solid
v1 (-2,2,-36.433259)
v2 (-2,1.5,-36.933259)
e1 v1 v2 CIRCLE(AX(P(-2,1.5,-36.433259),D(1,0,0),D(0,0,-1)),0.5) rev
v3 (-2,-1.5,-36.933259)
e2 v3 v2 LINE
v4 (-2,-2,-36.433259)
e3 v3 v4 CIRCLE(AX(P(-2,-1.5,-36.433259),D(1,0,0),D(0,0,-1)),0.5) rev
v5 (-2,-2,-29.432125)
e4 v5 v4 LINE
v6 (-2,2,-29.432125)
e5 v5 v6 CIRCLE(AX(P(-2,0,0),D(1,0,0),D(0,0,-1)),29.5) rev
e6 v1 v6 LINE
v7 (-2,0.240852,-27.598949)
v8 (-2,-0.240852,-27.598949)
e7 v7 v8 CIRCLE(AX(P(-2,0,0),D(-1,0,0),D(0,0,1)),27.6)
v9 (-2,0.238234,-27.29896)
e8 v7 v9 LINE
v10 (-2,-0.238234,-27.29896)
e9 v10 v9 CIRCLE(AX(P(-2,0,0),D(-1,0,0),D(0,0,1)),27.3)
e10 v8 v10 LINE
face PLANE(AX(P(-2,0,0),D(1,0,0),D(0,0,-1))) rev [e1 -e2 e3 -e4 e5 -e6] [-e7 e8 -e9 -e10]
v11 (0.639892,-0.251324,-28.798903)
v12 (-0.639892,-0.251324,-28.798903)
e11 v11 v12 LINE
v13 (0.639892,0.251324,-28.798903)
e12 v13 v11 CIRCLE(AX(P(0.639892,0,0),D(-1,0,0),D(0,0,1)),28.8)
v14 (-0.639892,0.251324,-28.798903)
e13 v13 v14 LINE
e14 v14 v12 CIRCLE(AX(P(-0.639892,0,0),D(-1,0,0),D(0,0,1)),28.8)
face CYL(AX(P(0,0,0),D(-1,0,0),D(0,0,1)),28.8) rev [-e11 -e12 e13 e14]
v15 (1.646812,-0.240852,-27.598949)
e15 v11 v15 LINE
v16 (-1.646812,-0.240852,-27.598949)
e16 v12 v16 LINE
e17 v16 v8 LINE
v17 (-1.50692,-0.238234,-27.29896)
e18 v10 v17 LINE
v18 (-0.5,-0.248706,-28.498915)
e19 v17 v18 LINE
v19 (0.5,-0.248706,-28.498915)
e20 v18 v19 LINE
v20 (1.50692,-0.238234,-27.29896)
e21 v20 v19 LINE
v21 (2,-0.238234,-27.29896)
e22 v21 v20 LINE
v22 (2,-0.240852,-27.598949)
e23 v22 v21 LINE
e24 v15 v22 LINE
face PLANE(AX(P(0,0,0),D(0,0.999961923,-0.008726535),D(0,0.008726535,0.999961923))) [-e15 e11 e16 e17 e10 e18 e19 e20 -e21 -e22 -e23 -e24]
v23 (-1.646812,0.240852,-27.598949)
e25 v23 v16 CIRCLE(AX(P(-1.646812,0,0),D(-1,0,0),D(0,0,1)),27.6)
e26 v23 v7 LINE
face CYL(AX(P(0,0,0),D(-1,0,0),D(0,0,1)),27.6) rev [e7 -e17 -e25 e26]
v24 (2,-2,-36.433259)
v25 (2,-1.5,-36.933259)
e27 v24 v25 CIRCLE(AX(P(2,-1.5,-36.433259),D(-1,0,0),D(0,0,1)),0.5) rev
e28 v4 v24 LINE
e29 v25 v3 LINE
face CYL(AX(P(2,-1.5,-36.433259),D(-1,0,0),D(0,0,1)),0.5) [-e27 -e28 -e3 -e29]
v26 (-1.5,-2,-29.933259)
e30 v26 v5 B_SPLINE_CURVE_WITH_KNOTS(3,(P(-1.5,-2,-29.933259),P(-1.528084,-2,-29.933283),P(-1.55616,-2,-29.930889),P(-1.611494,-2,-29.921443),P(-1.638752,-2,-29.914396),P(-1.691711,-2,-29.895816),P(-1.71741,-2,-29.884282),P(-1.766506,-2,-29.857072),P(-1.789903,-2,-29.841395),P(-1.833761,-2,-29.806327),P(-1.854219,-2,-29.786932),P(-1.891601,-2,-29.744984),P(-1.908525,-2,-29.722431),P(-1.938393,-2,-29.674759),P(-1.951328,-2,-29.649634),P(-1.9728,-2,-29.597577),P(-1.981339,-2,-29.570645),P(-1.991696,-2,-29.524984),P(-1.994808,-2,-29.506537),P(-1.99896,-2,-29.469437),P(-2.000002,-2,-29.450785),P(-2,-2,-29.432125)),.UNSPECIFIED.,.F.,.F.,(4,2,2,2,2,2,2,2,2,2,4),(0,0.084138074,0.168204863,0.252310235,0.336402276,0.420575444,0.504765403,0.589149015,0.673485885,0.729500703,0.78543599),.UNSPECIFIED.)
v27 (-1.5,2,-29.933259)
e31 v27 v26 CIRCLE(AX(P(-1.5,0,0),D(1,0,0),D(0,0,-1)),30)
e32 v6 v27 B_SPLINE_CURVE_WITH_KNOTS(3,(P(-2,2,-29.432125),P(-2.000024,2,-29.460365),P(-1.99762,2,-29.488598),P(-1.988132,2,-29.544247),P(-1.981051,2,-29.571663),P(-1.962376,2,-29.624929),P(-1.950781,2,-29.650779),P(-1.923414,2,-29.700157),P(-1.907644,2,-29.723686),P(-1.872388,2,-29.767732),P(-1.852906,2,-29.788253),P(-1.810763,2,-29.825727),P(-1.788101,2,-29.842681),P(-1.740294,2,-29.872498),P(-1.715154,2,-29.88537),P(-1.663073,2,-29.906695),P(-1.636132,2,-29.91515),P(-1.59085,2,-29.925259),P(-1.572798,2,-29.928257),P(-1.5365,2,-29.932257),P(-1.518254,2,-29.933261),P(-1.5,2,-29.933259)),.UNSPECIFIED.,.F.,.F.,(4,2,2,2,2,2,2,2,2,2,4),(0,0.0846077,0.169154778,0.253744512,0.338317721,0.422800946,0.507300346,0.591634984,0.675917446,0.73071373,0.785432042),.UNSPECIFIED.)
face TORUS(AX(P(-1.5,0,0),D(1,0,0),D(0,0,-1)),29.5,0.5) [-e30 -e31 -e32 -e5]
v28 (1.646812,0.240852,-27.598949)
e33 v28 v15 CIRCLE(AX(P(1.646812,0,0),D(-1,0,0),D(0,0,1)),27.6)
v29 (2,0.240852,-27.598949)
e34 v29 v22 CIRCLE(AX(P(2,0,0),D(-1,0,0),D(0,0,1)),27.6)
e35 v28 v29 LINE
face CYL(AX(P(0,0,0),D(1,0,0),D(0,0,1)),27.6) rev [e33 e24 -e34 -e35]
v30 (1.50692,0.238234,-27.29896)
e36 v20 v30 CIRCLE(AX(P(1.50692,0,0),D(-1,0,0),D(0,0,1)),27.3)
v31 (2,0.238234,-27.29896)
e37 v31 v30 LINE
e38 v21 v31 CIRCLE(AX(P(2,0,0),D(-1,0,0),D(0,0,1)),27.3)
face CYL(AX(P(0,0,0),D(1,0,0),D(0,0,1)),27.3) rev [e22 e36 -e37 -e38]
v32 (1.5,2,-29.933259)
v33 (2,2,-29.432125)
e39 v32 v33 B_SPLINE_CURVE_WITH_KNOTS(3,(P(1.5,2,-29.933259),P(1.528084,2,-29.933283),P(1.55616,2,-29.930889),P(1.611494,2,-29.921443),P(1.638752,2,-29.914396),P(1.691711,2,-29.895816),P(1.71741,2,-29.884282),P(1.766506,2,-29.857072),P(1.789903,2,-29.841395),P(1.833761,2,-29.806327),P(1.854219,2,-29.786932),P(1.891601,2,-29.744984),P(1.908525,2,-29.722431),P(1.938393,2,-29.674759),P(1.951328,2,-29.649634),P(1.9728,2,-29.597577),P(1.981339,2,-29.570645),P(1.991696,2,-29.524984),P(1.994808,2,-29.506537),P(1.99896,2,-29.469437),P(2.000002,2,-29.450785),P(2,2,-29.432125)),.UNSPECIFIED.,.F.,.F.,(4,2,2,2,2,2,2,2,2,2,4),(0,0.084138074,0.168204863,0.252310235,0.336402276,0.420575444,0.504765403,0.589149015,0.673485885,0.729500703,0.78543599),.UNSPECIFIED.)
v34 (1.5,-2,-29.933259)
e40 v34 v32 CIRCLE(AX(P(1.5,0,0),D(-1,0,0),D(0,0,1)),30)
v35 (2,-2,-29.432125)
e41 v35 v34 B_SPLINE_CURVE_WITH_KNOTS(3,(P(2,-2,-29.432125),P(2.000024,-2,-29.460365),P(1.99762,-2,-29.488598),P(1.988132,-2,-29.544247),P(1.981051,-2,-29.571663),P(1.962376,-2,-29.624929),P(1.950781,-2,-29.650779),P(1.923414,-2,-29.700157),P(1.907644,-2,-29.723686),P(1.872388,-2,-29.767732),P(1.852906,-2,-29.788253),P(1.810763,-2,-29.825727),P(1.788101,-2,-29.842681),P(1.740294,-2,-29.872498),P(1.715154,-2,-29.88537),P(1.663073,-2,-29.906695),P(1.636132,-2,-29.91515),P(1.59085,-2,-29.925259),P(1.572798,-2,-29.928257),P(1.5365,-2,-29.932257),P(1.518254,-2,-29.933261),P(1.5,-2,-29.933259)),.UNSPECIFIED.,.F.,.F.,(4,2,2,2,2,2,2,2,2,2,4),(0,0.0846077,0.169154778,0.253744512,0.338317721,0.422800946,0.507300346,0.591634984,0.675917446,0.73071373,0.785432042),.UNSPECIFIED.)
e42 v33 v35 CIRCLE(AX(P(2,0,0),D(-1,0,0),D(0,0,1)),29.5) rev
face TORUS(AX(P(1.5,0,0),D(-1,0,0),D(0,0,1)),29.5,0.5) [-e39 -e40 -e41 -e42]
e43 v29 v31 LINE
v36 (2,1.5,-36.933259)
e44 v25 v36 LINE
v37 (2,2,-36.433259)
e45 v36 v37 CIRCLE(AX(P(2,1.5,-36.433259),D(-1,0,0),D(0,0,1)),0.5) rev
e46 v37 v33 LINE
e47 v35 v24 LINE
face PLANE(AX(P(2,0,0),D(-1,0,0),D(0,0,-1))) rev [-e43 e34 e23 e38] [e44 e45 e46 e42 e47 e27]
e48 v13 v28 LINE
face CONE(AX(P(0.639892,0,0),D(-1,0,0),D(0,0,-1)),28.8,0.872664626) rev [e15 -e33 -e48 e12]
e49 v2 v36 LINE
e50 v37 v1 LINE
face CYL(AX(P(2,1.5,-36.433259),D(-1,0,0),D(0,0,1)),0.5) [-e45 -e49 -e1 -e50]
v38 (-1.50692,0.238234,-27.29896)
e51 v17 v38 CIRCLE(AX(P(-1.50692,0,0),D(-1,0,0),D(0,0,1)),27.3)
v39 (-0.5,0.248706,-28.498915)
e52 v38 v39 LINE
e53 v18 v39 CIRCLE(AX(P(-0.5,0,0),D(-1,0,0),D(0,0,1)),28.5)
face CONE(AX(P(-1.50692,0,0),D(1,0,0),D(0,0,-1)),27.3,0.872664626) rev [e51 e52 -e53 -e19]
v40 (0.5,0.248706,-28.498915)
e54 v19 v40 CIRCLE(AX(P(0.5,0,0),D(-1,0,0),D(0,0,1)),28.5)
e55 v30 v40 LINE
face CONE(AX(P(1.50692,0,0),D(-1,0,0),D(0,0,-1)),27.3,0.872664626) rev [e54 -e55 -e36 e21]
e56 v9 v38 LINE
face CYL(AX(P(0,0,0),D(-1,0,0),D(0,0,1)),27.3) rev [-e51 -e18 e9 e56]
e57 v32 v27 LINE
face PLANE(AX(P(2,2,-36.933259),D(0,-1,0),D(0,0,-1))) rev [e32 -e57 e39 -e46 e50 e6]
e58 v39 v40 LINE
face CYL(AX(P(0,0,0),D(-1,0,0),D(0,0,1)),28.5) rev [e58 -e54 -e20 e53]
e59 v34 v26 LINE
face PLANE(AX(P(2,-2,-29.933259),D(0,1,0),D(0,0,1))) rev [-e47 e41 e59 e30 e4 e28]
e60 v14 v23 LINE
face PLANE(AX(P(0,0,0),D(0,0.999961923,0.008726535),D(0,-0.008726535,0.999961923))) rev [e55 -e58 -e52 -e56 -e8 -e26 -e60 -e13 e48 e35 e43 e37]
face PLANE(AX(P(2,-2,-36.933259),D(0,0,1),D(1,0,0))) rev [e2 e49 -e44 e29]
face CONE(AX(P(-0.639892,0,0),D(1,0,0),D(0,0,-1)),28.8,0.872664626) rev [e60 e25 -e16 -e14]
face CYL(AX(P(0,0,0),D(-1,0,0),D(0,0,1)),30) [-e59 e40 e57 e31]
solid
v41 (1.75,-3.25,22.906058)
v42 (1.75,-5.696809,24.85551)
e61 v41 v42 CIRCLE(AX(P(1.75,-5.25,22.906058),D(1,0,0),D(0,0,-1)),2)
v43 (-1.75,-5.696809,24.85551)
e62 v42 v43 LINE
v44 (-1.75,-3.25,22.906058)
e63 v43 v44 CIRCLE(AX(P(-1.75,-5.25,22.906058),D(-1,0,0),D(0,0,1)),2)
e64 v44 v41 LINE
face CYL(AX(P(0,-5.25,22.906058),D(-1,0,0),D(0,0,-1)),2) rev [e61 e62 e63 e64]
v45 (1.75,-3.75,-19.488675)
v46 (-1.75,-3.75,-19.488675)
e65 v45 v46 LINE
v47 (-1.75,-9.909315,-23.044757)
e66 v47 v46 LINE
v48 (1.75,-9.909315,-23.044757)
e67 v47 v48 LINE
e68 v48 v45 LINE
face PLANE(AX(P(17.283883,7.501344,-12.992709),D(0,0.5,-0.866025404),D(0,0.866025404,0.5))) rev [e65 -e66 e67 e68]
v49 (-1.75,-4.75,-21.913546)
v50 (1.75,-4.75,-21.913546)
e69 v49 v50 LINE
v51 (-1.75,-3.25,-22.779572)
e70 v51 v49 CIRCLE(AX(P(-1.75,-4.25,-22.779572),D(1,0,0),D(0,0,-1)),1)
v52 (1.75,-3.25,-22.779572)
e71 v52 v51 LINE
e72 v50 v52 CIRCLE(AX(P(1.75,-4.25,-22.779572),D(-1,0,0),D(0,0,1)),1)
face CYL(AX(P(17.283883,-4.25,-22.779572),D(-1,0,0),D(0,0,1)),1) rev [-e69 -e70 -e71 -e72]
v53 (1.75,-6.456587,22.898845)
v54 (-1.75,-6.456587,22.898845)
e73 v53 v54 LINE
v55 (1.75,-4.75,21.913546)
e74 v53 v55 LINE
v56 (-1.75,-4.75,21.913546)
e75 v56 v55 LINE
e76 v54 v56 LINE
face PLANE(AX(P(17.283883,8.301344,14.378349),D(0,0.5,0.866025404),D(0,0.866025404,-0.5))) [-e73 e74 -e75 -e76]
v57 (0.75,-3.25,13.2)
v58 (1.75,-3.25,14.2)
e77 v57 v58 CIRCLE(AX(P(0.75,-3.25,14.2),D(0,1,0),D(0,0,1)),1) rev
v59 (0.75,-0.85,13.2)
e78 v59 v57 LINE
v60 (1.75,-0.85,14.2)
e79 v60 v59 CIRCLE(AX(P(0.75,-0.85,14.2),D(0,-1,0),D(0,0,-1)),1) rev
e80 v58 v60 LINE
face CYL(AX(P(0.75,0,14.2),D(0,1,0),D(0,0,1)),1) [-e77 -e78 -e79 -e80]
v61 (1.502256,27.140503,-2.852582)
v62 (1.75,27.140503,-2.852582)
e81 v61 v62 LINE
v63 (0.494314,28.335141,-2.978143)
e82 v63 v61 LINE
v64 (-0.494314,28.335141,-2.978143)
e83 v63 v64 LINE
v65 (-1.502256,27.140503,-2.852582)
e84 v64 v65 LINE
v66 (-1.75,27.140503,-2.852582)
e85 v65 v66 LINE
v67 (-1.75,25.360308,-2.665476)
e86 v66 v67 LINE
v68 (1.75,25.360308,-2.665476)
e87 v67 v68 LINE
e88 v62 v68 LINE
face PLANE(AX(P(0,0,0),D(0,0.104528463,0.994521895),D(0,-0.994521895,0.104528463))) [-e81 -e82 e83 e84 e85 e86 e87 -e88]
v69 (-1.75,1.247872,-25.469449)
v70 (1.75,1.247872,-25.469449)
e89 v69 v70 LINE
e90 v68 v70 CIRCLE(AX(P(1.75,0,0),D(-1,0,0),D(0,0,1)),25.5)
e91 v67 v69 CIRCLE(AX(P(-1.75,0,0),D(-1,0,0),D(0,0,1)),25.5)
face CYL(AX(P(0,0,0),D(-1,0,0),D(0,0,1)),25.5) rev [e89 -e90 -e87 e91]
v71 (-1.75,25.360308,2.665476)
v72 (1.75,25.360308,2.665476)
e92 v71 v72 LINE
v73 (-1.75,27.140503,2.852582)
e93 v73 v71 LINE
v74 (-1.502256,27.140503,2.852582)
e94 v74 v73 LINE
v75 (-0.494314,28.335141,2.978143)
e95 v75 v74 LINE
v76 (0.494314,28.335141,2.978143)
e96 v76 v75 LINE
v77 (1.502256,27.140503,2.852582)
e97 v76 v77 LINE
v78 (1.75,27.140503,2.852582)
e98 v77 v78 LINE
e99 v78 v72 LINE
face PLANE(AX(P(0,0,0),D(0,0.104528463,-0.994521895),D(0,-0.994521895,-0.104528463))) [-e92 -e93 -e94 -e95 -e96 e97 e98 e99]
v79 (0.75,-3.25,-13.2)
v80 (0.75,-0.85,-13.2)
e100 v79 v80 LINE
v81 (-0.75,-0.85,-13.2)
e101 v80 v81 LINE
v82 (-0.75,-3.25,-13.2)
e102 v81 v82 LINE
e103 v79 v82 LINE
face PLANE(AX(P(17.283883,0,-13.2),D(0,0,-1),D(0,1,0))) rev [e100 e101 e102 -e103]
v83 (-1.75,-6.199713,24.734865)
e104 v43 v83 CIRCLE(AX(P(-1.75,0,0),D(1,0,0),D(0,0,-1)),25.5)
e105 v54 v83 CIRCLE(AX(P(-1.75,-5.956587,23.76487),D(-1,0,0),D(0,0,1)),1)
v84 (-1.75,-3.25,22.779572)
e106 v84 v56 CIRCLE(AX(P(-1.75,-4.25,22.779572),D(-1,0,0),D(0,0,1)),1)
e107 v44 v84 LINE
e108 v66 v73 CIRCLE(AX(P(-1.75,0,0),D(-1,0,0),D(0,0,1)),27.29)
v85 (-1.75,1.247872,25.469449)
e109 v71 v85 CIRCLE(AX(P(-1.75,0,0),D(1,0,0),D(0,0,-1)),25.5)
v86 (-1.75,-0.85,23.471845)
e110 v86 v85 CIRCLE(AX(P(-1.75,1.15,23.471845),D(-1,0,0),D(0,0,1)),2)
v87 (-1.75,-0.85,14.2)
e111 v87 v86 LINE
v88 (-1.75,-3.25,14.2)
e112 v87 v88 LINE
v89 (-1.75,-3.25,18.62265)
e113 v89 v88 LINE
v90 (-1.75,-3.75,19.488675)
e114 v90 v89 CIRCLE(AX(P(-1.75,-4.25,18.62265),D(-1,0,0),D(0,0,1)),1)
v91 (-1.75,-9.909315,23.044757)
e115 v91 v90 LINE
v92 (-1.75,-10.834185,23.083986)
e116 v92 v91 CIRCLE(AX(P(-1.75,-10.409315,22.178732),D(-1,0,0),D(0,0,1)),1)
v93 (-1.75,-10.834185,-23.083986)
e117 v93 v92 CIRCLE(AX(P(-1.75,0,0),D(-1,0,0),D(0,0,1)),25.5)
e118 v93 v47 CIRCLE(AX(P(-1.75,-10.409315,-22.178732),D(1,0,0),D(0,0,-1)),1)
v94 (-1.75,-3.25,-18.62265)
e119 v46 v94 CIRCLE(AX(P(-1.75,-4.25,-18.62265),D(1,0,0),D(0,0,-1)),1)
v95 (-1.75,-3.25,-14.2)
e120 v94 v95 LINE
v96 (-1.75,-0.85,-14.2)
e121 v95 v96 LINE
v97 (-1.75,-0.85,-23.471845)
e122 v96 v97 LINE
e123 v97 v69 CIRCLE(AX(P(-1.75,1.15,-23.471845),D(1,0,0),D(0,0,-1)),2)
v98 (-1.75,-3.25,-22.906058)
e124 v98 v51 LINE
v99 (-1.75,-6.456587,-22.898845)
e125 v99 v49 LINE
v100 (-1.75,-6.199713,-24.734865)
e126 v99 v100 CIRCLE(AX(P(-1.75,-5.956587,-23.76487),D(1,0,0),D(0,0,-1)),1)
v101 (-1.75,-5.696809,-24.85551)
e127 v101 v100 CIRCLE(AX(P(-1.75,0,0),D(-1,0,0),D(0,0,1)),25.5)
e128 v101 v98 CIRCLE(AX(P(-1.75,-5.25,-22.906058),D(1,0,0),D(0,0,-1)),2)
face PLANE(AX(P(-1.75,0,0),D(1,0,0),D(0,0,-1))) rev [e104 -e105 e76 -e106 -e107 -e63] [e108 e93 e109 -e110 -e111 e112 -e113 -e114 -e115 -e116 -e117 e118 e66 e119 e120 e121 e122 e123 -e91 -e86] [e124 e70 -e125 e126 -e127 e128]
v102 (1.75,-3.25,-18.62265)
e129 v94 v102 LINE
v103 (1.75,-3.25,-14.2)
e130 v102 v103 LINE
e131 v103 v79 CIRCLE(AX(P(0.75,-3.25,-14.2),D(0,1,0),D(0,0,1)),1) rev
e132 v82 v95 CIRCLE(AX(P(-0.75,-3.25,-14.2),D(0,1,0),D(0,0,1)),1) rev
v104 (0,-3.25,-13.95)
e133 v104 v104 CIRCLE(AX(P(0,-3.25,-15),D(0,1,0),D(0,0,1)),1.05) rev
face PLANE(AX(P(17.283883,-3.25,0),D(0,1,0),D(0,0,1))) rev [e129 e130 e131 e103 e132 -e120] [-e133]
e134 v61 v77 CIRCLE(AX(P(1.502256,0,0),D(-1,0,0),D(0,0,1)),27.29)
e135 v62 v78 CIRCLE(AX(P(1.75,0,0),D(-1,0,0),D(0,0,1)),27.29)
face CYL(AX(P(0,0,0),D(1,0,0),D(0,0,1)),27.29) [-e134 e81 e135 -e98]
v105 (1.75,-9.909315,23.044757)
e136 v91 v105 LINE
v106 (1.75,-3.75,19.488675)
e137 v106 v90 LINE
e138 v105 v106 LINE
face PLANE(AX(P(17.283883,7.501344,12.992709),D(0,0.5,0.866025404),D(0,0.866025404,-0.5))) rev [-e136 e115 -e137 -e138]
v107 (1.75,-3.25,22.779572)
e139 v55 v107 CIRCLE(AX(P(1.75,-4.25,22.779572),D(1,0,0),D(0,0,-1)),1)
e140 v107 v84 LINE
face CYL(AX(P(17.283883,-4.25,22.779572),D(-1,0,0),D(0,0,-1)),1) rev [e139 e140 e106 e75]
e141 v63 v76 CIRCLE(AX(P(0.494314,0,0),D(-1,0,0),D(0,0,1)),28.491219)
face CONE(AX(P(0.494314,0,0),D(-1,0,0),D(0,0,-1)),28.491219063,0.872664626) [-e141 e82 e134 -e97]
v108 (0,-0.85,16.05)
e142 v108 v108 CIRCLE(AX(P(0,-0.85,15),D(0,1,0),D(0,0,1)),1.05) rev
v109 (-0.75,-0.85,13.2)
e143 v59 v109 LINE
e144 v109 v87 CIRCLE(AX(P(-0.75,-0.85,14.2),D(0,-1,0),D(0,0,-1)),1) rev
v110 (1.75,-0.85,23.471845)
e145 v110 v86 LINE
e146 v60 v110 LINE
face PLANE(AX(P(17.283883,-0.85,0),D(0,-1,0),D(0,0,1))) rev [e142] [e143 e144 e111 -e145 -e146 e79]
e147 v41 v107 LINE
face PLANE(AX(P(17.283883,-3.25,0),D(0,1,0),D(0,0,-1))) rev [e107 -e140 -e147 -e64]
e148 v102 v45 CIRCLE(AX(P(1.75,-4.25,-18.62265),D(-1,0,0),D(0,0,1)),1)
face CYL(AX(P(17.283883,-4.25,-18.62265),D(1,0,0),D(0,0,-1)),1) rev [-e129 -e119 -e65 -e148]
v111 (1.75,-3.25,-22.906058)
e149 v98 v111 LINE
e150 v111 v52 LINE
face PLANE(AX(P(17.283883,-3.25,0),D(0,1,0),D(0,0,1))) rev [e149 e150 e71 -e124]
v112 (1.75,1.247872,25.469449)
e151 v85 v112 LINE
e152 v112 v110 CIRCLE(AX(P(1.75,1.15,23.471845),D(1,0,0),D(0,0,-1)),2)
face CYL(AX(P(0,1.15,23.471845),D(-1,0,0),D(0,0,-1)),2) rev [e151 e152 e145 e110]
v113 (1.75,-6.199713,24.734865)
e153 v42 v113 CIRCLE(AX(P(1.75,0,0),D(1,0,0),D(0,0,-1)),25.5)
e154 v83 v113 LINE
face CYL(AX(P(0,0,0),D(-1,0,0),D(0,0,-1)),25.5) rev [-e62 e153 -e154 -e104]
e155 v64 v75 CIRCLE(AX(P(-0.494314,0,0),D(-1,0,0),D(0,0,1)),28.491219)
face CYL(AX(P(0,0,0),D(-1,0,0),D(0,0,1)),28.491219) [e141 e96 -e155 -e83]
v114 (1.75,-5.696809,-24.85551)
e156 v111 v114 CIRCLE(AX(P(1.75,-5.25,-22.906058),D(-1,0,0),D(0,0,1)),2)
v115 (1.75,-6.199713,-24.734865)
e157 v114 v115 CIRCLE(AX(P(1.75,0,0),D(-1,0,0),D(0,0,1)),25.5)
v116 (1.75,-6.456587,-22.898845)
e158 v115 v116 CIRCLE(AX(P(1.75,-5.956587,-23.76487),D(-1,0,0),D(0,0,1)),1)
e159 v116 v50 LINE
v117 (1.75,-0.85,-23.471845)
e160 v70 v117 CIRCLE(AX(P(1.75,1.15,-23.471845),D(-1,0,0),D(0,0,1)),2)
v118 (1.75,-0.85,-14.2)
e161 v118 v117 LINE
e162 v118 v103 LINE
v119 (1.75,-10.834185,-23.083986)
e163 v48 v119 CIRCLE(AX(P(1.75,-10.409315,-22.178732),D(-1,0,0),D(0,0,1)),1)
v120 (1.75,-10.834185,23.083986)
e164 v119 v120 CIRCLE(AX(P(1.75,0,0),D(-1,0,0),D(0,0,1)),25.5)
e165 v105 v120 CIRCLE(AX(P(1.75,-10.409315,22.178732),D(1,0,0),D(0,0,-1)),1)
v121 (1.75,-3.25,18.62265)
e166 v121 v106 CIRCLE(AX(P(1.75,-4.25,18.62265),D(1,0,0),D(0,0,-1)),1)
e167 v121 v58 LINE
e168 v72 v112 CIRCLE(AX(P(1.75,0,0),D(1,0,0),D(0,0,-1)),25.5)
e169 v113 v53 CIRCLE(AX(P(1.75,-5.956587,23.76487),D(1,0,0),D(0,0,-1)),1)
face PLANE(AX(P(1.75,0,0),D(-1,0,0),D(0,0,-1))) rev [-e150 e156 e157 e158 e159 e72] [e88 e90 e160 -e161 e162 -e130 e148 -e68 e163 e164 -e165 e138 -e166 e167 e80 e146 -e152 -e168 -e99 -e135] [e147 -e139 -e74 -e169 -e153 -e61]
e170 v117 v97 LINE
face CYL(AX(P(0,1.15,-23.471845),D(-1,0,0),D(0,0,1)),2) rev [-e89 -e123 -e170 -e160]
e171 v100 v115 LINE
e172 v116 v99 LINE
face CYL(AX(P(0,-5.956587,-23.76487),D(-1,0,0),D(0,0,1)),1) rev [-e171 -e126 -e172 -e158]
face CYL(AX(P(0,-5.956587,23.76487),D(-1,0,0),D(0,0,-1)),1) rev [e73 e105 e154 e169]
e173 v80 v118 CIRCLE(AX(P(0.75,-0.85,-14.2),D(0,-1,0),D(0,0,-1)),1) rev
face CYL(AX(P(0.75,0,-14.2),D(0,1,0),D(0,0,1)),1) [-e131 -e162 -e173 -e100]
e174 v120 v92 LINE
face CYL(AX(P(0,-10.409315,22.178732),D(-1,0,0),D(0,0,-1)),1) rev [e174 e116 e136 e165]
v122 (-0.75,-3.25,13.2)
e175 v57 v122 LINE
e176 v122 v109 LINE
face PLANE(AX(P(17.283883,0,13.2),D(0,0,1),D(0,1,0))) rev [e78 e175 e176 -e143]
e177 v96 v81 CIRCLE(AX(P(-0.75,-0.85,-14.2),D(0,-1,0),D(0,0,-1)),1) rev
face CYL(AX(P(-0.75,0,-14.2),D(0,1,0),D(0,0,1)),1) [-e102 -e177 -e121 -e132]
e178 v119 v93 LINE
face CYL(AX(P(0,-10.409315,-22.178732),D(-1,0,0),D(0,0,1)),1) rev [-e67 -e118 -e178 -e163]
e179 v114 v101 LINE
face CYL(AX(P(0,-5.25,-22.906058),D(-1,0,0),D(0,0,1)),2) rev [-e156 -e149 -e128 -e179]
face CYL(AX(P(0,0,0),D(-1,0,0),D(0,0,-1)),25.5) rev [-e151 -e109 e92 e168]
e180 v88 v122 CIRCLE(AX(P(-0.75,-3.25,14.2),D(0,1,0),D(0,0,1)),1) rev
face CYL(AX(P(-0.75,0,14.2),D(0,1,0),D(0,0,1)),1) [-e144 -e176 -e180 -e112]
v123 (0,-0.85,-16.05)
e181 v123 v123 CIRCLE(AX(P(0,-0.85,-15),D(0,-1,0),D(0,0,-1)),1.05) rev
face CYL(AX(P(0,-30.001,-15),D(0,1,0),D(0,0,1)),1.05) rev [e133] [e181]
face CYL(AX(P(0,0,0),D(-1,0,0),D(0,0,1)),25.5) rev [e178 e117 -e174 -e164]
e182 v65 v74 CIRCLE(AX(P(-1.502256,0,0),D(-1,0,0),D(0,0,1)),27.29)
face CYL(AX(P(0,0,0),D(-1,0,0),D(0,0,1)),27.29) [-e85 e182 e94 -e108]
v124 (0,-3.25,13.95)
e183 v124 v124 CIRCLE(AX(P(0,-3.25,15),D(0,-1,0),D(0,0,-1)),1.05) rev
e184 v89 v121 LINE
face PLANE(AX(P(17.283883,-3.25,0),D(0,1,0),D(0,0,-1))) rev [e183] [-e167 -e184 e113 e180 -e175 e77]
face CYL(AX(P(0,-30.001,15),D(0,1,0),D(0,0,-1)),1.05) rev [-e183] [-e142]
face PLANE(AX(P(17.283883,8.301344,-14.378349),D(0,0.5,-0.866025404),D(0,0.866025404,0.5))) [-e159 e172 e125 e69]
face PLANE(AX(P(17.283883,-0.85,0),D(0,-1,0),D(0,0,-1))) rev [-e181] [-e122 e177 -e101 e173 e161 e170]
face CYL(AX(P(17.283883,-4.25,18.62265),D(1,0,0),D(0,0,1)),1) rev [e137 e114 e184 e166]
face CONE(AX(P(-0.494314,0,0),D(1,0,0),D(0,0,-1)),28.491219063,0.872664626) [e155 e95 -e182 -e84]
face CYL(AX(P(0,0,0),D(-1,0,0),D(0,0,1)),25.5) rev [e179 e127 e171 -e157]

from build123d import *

# Parameters (mm, degrees)
REVOLVE2_ANGLE      = 174
BOSS_EXTRUDE1_START = -1.75
BOSS_EXTRUDE1_DEPTH = 3.5
FILLET1_R           = 2
FILLET2_R           = 1
CUT_EXTRUDE1_REACH  = 44.474
SKETCH4_R           = 1.05
SKETCH5_W           = 7
SKETCH5_H           = 4
BOSS_EXTRUDE2_DEPTH = 2
CUT_REVOLVE1_ANGLE  = 1
FILLET3_R           = 0.5
FILLET4_R           = 0.5
FILLET5_R           = 1


# Read off the part's stored shape, not the designer's step: Revolve2
with BuildPart() as part:
    # Sketch2 → Revolve1 (revolve)
    with BuildSketch(Plane(origin=(0, 0, 0), x_dir=(1, 0, 0), z_dir=(0, 1, 0)), mode=Mode.PRIVATE) as revolve1_sk:
        Polygon((-0.5, 28.5), (0, 28.5), (0, 30), (-2, 30), (-2, 27.3), (-1.506919557, 27.3), align=None)
    revolve1 = revolve(revolve1_sk.sketch.rotate(Axis((0, 0, 0), (1, 0, 0)), 180), axis=Axis((0, 0, 0), (1, 0, 0)))


with BuildPart() as body_2:
    # Revolve2 outline → Revolve2 (revolve)
    with BuildSketch(Plane(origin=(0, 0, 0), x_dir=(0, -1, 0), z_dir=(0, 0, 1))):
        Polygon((25.5, 0), (25.5, -1.75), (27.29, -1.75), (27.29, -1.502256481), (28.491219063, -0.494314008), (28.491219063, 0), align=None)
    revolve2 = revolve(axis=Axis((0, 0, 0), (1, 0, 0)), revolution_arc=REVOLVE2_ANGLE)


with BuildPart() as part_1:
    add(part.part)

    add(body_2.part)  # Mirror1 merges body 2
    # Mirror1: Revolve1, Revolve2 across plane
    add(revolve1.mirror(Plane(origin=(0, 0, 0), x_dir=(0, 0, 1), z_dir=(1, 0, 0))))
    add(revolve2.mirror(Plane(origin=(0, 0, 0), x_dir=(0, 0, 1), z_dir=(1, 0, 0))))

    # Sketch3 → Boss-Extrude1 (add)
    with BuildSketch(Plane(origin=(0, 0, 0), x_dir=(0, 0, -1), z_dir=(1, 0, 0)).offset(BOSS_EXTRUDE1_START)):
        with BuildLine():
            ThreePointArc((25.292044204, -3.25), (25.417279788, -2.052288521), (25.485829396, -0.85))
            Line((25.485829396, -0.85), (13.2, -0.85))
            Line((13.2, -0.85), (13.2, -3.25))
            Line((13.2, -3.25), (19.2, -3.25))
            Line((19.2, -3.25), (23.302526372, -10.355784116))
            ThreePointArc((23.302526372, -10.355784116), (23.69804938, -9.415543296), (24.055652184, -8.460236286))
            Line((24.055652184, -8.460236286), (21.047520861, -3.25))
            Line((21.047520861, -3.25), (25.292044204, -3.25))
        make_face()
    extrude(amount=BOSS_EXTRUDE1_DEPTH)

    # Fillet1
    fillet1_edges = [part_1.edges().sort_by_distance(p)[0] for p in [
        (0, -0.85, -25.485829396),
        (0, -3.25, -25.292044204),
    ]]
    fillet(fillet1_edges, radius=FILLET1_R)

    # Fillet2
    fillet2_edges = [part_1.edges().sort_by_distance(p)[0] for p in [
        (0, -3.25, -21.047520861),
        (0, -8.460236286, -24.055652184),
        (0, -10.355784116, -23.302526372),
        (0, -3.25, -19.2),
    ]]
    fillet(fillet2_edges, radius=FILLET2_R)

    # Sketch4 → Cut-Extrude1 (cut, up to next)
    with BuildSketch(Plane(origin=(0, 0, 0), x_dir=(1, 0, 0), z_dir=(0, 1, 0)), mode=Mode.PRIVATE) as cut_extrude1_sk1:
        with Locations(Location((0, 15, 0), (0, 0, 270))):
            Circle(SKETCH4_R)
    cut_extrude1_tool1 = extrude(cut_extrude1_sk1.sketch, amount=-CUT_EXTRUDE1_REACH, mode=Mode.PRIVATE) & part_1.part
    add(cut_extrude1_tool1.solids().sort_by_distance((0, 0, -15))[0], mode=Mode.SUBTRACT)

    # Mirror2: part across plane


with BuildPart() as part_2:
    add(part_1.part)
    add(part_1.part.mirror(Plane.XY))

    # Sketch5 → Boss-Extrude2 (add, symmetric)
    with BuildSketch(Plane(origin=(0, 0, 0), x_dir=(0, 0, -1), z_dir=(1, 0, 0))):
        with Locations((33.433259094, 0)):
            Rectangle(SKETCH5_W, SKETCH5_H)
    extrude(amount=BOSS_EXTRUDE2_DEPTH, both=True)

    # Sketch6 → Cut-Revolve1 (revolve, symmetric, cut)
    with BuildSketch(Plane(origin=(0, 0, 0), x_dir=(1, 0, 0), z_dir=(0, 1, 0))) as cut_revolve1_sk:
        Polygon((-2, 27.6), (-2, 27.3), (-1.506919557, 27.3), (-0.5, 28.5), (0, 28.5), (0, 28.8), (-0.639892297, 28.8), (-1.646811855, 27.6), align=None)
    cut_revolve1 = revolve(axis=Axis((0, 0, 0), (1, 0, 0)), revolution_arc=CUT_REVOLVE1_ANGLE / 2, mode=Mode.SUBTRACT)
    cut_revolve1 = cut_revolve1 + revolve(cut_revolve1_sk.sketch, axis=Axis((0, 0, 0), (-1, 0, 0)), revolution_arc=CUT_REVOLVE1_ANGLE / 2, mode=Mode.SUBTRACT)

    # Mirror3: Cut-Revolve1 across plane
    add(cut_revolve1.mirror(Plane(origin=(0, 0, 0), x_dir=(0, 0, 1), z_dir=(1, 0, 0))), mode=Mode.SUBTRACT)

    # Fillet3
    fillet3_edges = [part_2.edges().sort_by_distance(p)[0] for p in [
        (0, 2, -36.933259094),
        (0, -2, -36.933259094),
    ]]
    fillet(fillet3_edges, radius=FILLET3_R)

    # Fillet4
    fillet4_edges = [part_2.edges().sort_by_distance(p)[0] for p in [
        (2, -29.983310131, 1.000556639),
        (-2, -29.983310131, 1.000556639),
    ]]
    fillet(fillet4_edges, radius=FILLET4_R)

    # Fillet5
    fillet5_edges = [part_2.edges().sort_by_distance(p)[0] for p in [
        (1.75, -2.05, 13.2),
        (-1.75, -2.05, 13.2),
        (1.75, -2.05, -13.2),
        (-1.75, -2.05, -13.2),
    ]]
    fillet(fillet5_edges, radius=FILLET5_R)


solid = part_2.part
